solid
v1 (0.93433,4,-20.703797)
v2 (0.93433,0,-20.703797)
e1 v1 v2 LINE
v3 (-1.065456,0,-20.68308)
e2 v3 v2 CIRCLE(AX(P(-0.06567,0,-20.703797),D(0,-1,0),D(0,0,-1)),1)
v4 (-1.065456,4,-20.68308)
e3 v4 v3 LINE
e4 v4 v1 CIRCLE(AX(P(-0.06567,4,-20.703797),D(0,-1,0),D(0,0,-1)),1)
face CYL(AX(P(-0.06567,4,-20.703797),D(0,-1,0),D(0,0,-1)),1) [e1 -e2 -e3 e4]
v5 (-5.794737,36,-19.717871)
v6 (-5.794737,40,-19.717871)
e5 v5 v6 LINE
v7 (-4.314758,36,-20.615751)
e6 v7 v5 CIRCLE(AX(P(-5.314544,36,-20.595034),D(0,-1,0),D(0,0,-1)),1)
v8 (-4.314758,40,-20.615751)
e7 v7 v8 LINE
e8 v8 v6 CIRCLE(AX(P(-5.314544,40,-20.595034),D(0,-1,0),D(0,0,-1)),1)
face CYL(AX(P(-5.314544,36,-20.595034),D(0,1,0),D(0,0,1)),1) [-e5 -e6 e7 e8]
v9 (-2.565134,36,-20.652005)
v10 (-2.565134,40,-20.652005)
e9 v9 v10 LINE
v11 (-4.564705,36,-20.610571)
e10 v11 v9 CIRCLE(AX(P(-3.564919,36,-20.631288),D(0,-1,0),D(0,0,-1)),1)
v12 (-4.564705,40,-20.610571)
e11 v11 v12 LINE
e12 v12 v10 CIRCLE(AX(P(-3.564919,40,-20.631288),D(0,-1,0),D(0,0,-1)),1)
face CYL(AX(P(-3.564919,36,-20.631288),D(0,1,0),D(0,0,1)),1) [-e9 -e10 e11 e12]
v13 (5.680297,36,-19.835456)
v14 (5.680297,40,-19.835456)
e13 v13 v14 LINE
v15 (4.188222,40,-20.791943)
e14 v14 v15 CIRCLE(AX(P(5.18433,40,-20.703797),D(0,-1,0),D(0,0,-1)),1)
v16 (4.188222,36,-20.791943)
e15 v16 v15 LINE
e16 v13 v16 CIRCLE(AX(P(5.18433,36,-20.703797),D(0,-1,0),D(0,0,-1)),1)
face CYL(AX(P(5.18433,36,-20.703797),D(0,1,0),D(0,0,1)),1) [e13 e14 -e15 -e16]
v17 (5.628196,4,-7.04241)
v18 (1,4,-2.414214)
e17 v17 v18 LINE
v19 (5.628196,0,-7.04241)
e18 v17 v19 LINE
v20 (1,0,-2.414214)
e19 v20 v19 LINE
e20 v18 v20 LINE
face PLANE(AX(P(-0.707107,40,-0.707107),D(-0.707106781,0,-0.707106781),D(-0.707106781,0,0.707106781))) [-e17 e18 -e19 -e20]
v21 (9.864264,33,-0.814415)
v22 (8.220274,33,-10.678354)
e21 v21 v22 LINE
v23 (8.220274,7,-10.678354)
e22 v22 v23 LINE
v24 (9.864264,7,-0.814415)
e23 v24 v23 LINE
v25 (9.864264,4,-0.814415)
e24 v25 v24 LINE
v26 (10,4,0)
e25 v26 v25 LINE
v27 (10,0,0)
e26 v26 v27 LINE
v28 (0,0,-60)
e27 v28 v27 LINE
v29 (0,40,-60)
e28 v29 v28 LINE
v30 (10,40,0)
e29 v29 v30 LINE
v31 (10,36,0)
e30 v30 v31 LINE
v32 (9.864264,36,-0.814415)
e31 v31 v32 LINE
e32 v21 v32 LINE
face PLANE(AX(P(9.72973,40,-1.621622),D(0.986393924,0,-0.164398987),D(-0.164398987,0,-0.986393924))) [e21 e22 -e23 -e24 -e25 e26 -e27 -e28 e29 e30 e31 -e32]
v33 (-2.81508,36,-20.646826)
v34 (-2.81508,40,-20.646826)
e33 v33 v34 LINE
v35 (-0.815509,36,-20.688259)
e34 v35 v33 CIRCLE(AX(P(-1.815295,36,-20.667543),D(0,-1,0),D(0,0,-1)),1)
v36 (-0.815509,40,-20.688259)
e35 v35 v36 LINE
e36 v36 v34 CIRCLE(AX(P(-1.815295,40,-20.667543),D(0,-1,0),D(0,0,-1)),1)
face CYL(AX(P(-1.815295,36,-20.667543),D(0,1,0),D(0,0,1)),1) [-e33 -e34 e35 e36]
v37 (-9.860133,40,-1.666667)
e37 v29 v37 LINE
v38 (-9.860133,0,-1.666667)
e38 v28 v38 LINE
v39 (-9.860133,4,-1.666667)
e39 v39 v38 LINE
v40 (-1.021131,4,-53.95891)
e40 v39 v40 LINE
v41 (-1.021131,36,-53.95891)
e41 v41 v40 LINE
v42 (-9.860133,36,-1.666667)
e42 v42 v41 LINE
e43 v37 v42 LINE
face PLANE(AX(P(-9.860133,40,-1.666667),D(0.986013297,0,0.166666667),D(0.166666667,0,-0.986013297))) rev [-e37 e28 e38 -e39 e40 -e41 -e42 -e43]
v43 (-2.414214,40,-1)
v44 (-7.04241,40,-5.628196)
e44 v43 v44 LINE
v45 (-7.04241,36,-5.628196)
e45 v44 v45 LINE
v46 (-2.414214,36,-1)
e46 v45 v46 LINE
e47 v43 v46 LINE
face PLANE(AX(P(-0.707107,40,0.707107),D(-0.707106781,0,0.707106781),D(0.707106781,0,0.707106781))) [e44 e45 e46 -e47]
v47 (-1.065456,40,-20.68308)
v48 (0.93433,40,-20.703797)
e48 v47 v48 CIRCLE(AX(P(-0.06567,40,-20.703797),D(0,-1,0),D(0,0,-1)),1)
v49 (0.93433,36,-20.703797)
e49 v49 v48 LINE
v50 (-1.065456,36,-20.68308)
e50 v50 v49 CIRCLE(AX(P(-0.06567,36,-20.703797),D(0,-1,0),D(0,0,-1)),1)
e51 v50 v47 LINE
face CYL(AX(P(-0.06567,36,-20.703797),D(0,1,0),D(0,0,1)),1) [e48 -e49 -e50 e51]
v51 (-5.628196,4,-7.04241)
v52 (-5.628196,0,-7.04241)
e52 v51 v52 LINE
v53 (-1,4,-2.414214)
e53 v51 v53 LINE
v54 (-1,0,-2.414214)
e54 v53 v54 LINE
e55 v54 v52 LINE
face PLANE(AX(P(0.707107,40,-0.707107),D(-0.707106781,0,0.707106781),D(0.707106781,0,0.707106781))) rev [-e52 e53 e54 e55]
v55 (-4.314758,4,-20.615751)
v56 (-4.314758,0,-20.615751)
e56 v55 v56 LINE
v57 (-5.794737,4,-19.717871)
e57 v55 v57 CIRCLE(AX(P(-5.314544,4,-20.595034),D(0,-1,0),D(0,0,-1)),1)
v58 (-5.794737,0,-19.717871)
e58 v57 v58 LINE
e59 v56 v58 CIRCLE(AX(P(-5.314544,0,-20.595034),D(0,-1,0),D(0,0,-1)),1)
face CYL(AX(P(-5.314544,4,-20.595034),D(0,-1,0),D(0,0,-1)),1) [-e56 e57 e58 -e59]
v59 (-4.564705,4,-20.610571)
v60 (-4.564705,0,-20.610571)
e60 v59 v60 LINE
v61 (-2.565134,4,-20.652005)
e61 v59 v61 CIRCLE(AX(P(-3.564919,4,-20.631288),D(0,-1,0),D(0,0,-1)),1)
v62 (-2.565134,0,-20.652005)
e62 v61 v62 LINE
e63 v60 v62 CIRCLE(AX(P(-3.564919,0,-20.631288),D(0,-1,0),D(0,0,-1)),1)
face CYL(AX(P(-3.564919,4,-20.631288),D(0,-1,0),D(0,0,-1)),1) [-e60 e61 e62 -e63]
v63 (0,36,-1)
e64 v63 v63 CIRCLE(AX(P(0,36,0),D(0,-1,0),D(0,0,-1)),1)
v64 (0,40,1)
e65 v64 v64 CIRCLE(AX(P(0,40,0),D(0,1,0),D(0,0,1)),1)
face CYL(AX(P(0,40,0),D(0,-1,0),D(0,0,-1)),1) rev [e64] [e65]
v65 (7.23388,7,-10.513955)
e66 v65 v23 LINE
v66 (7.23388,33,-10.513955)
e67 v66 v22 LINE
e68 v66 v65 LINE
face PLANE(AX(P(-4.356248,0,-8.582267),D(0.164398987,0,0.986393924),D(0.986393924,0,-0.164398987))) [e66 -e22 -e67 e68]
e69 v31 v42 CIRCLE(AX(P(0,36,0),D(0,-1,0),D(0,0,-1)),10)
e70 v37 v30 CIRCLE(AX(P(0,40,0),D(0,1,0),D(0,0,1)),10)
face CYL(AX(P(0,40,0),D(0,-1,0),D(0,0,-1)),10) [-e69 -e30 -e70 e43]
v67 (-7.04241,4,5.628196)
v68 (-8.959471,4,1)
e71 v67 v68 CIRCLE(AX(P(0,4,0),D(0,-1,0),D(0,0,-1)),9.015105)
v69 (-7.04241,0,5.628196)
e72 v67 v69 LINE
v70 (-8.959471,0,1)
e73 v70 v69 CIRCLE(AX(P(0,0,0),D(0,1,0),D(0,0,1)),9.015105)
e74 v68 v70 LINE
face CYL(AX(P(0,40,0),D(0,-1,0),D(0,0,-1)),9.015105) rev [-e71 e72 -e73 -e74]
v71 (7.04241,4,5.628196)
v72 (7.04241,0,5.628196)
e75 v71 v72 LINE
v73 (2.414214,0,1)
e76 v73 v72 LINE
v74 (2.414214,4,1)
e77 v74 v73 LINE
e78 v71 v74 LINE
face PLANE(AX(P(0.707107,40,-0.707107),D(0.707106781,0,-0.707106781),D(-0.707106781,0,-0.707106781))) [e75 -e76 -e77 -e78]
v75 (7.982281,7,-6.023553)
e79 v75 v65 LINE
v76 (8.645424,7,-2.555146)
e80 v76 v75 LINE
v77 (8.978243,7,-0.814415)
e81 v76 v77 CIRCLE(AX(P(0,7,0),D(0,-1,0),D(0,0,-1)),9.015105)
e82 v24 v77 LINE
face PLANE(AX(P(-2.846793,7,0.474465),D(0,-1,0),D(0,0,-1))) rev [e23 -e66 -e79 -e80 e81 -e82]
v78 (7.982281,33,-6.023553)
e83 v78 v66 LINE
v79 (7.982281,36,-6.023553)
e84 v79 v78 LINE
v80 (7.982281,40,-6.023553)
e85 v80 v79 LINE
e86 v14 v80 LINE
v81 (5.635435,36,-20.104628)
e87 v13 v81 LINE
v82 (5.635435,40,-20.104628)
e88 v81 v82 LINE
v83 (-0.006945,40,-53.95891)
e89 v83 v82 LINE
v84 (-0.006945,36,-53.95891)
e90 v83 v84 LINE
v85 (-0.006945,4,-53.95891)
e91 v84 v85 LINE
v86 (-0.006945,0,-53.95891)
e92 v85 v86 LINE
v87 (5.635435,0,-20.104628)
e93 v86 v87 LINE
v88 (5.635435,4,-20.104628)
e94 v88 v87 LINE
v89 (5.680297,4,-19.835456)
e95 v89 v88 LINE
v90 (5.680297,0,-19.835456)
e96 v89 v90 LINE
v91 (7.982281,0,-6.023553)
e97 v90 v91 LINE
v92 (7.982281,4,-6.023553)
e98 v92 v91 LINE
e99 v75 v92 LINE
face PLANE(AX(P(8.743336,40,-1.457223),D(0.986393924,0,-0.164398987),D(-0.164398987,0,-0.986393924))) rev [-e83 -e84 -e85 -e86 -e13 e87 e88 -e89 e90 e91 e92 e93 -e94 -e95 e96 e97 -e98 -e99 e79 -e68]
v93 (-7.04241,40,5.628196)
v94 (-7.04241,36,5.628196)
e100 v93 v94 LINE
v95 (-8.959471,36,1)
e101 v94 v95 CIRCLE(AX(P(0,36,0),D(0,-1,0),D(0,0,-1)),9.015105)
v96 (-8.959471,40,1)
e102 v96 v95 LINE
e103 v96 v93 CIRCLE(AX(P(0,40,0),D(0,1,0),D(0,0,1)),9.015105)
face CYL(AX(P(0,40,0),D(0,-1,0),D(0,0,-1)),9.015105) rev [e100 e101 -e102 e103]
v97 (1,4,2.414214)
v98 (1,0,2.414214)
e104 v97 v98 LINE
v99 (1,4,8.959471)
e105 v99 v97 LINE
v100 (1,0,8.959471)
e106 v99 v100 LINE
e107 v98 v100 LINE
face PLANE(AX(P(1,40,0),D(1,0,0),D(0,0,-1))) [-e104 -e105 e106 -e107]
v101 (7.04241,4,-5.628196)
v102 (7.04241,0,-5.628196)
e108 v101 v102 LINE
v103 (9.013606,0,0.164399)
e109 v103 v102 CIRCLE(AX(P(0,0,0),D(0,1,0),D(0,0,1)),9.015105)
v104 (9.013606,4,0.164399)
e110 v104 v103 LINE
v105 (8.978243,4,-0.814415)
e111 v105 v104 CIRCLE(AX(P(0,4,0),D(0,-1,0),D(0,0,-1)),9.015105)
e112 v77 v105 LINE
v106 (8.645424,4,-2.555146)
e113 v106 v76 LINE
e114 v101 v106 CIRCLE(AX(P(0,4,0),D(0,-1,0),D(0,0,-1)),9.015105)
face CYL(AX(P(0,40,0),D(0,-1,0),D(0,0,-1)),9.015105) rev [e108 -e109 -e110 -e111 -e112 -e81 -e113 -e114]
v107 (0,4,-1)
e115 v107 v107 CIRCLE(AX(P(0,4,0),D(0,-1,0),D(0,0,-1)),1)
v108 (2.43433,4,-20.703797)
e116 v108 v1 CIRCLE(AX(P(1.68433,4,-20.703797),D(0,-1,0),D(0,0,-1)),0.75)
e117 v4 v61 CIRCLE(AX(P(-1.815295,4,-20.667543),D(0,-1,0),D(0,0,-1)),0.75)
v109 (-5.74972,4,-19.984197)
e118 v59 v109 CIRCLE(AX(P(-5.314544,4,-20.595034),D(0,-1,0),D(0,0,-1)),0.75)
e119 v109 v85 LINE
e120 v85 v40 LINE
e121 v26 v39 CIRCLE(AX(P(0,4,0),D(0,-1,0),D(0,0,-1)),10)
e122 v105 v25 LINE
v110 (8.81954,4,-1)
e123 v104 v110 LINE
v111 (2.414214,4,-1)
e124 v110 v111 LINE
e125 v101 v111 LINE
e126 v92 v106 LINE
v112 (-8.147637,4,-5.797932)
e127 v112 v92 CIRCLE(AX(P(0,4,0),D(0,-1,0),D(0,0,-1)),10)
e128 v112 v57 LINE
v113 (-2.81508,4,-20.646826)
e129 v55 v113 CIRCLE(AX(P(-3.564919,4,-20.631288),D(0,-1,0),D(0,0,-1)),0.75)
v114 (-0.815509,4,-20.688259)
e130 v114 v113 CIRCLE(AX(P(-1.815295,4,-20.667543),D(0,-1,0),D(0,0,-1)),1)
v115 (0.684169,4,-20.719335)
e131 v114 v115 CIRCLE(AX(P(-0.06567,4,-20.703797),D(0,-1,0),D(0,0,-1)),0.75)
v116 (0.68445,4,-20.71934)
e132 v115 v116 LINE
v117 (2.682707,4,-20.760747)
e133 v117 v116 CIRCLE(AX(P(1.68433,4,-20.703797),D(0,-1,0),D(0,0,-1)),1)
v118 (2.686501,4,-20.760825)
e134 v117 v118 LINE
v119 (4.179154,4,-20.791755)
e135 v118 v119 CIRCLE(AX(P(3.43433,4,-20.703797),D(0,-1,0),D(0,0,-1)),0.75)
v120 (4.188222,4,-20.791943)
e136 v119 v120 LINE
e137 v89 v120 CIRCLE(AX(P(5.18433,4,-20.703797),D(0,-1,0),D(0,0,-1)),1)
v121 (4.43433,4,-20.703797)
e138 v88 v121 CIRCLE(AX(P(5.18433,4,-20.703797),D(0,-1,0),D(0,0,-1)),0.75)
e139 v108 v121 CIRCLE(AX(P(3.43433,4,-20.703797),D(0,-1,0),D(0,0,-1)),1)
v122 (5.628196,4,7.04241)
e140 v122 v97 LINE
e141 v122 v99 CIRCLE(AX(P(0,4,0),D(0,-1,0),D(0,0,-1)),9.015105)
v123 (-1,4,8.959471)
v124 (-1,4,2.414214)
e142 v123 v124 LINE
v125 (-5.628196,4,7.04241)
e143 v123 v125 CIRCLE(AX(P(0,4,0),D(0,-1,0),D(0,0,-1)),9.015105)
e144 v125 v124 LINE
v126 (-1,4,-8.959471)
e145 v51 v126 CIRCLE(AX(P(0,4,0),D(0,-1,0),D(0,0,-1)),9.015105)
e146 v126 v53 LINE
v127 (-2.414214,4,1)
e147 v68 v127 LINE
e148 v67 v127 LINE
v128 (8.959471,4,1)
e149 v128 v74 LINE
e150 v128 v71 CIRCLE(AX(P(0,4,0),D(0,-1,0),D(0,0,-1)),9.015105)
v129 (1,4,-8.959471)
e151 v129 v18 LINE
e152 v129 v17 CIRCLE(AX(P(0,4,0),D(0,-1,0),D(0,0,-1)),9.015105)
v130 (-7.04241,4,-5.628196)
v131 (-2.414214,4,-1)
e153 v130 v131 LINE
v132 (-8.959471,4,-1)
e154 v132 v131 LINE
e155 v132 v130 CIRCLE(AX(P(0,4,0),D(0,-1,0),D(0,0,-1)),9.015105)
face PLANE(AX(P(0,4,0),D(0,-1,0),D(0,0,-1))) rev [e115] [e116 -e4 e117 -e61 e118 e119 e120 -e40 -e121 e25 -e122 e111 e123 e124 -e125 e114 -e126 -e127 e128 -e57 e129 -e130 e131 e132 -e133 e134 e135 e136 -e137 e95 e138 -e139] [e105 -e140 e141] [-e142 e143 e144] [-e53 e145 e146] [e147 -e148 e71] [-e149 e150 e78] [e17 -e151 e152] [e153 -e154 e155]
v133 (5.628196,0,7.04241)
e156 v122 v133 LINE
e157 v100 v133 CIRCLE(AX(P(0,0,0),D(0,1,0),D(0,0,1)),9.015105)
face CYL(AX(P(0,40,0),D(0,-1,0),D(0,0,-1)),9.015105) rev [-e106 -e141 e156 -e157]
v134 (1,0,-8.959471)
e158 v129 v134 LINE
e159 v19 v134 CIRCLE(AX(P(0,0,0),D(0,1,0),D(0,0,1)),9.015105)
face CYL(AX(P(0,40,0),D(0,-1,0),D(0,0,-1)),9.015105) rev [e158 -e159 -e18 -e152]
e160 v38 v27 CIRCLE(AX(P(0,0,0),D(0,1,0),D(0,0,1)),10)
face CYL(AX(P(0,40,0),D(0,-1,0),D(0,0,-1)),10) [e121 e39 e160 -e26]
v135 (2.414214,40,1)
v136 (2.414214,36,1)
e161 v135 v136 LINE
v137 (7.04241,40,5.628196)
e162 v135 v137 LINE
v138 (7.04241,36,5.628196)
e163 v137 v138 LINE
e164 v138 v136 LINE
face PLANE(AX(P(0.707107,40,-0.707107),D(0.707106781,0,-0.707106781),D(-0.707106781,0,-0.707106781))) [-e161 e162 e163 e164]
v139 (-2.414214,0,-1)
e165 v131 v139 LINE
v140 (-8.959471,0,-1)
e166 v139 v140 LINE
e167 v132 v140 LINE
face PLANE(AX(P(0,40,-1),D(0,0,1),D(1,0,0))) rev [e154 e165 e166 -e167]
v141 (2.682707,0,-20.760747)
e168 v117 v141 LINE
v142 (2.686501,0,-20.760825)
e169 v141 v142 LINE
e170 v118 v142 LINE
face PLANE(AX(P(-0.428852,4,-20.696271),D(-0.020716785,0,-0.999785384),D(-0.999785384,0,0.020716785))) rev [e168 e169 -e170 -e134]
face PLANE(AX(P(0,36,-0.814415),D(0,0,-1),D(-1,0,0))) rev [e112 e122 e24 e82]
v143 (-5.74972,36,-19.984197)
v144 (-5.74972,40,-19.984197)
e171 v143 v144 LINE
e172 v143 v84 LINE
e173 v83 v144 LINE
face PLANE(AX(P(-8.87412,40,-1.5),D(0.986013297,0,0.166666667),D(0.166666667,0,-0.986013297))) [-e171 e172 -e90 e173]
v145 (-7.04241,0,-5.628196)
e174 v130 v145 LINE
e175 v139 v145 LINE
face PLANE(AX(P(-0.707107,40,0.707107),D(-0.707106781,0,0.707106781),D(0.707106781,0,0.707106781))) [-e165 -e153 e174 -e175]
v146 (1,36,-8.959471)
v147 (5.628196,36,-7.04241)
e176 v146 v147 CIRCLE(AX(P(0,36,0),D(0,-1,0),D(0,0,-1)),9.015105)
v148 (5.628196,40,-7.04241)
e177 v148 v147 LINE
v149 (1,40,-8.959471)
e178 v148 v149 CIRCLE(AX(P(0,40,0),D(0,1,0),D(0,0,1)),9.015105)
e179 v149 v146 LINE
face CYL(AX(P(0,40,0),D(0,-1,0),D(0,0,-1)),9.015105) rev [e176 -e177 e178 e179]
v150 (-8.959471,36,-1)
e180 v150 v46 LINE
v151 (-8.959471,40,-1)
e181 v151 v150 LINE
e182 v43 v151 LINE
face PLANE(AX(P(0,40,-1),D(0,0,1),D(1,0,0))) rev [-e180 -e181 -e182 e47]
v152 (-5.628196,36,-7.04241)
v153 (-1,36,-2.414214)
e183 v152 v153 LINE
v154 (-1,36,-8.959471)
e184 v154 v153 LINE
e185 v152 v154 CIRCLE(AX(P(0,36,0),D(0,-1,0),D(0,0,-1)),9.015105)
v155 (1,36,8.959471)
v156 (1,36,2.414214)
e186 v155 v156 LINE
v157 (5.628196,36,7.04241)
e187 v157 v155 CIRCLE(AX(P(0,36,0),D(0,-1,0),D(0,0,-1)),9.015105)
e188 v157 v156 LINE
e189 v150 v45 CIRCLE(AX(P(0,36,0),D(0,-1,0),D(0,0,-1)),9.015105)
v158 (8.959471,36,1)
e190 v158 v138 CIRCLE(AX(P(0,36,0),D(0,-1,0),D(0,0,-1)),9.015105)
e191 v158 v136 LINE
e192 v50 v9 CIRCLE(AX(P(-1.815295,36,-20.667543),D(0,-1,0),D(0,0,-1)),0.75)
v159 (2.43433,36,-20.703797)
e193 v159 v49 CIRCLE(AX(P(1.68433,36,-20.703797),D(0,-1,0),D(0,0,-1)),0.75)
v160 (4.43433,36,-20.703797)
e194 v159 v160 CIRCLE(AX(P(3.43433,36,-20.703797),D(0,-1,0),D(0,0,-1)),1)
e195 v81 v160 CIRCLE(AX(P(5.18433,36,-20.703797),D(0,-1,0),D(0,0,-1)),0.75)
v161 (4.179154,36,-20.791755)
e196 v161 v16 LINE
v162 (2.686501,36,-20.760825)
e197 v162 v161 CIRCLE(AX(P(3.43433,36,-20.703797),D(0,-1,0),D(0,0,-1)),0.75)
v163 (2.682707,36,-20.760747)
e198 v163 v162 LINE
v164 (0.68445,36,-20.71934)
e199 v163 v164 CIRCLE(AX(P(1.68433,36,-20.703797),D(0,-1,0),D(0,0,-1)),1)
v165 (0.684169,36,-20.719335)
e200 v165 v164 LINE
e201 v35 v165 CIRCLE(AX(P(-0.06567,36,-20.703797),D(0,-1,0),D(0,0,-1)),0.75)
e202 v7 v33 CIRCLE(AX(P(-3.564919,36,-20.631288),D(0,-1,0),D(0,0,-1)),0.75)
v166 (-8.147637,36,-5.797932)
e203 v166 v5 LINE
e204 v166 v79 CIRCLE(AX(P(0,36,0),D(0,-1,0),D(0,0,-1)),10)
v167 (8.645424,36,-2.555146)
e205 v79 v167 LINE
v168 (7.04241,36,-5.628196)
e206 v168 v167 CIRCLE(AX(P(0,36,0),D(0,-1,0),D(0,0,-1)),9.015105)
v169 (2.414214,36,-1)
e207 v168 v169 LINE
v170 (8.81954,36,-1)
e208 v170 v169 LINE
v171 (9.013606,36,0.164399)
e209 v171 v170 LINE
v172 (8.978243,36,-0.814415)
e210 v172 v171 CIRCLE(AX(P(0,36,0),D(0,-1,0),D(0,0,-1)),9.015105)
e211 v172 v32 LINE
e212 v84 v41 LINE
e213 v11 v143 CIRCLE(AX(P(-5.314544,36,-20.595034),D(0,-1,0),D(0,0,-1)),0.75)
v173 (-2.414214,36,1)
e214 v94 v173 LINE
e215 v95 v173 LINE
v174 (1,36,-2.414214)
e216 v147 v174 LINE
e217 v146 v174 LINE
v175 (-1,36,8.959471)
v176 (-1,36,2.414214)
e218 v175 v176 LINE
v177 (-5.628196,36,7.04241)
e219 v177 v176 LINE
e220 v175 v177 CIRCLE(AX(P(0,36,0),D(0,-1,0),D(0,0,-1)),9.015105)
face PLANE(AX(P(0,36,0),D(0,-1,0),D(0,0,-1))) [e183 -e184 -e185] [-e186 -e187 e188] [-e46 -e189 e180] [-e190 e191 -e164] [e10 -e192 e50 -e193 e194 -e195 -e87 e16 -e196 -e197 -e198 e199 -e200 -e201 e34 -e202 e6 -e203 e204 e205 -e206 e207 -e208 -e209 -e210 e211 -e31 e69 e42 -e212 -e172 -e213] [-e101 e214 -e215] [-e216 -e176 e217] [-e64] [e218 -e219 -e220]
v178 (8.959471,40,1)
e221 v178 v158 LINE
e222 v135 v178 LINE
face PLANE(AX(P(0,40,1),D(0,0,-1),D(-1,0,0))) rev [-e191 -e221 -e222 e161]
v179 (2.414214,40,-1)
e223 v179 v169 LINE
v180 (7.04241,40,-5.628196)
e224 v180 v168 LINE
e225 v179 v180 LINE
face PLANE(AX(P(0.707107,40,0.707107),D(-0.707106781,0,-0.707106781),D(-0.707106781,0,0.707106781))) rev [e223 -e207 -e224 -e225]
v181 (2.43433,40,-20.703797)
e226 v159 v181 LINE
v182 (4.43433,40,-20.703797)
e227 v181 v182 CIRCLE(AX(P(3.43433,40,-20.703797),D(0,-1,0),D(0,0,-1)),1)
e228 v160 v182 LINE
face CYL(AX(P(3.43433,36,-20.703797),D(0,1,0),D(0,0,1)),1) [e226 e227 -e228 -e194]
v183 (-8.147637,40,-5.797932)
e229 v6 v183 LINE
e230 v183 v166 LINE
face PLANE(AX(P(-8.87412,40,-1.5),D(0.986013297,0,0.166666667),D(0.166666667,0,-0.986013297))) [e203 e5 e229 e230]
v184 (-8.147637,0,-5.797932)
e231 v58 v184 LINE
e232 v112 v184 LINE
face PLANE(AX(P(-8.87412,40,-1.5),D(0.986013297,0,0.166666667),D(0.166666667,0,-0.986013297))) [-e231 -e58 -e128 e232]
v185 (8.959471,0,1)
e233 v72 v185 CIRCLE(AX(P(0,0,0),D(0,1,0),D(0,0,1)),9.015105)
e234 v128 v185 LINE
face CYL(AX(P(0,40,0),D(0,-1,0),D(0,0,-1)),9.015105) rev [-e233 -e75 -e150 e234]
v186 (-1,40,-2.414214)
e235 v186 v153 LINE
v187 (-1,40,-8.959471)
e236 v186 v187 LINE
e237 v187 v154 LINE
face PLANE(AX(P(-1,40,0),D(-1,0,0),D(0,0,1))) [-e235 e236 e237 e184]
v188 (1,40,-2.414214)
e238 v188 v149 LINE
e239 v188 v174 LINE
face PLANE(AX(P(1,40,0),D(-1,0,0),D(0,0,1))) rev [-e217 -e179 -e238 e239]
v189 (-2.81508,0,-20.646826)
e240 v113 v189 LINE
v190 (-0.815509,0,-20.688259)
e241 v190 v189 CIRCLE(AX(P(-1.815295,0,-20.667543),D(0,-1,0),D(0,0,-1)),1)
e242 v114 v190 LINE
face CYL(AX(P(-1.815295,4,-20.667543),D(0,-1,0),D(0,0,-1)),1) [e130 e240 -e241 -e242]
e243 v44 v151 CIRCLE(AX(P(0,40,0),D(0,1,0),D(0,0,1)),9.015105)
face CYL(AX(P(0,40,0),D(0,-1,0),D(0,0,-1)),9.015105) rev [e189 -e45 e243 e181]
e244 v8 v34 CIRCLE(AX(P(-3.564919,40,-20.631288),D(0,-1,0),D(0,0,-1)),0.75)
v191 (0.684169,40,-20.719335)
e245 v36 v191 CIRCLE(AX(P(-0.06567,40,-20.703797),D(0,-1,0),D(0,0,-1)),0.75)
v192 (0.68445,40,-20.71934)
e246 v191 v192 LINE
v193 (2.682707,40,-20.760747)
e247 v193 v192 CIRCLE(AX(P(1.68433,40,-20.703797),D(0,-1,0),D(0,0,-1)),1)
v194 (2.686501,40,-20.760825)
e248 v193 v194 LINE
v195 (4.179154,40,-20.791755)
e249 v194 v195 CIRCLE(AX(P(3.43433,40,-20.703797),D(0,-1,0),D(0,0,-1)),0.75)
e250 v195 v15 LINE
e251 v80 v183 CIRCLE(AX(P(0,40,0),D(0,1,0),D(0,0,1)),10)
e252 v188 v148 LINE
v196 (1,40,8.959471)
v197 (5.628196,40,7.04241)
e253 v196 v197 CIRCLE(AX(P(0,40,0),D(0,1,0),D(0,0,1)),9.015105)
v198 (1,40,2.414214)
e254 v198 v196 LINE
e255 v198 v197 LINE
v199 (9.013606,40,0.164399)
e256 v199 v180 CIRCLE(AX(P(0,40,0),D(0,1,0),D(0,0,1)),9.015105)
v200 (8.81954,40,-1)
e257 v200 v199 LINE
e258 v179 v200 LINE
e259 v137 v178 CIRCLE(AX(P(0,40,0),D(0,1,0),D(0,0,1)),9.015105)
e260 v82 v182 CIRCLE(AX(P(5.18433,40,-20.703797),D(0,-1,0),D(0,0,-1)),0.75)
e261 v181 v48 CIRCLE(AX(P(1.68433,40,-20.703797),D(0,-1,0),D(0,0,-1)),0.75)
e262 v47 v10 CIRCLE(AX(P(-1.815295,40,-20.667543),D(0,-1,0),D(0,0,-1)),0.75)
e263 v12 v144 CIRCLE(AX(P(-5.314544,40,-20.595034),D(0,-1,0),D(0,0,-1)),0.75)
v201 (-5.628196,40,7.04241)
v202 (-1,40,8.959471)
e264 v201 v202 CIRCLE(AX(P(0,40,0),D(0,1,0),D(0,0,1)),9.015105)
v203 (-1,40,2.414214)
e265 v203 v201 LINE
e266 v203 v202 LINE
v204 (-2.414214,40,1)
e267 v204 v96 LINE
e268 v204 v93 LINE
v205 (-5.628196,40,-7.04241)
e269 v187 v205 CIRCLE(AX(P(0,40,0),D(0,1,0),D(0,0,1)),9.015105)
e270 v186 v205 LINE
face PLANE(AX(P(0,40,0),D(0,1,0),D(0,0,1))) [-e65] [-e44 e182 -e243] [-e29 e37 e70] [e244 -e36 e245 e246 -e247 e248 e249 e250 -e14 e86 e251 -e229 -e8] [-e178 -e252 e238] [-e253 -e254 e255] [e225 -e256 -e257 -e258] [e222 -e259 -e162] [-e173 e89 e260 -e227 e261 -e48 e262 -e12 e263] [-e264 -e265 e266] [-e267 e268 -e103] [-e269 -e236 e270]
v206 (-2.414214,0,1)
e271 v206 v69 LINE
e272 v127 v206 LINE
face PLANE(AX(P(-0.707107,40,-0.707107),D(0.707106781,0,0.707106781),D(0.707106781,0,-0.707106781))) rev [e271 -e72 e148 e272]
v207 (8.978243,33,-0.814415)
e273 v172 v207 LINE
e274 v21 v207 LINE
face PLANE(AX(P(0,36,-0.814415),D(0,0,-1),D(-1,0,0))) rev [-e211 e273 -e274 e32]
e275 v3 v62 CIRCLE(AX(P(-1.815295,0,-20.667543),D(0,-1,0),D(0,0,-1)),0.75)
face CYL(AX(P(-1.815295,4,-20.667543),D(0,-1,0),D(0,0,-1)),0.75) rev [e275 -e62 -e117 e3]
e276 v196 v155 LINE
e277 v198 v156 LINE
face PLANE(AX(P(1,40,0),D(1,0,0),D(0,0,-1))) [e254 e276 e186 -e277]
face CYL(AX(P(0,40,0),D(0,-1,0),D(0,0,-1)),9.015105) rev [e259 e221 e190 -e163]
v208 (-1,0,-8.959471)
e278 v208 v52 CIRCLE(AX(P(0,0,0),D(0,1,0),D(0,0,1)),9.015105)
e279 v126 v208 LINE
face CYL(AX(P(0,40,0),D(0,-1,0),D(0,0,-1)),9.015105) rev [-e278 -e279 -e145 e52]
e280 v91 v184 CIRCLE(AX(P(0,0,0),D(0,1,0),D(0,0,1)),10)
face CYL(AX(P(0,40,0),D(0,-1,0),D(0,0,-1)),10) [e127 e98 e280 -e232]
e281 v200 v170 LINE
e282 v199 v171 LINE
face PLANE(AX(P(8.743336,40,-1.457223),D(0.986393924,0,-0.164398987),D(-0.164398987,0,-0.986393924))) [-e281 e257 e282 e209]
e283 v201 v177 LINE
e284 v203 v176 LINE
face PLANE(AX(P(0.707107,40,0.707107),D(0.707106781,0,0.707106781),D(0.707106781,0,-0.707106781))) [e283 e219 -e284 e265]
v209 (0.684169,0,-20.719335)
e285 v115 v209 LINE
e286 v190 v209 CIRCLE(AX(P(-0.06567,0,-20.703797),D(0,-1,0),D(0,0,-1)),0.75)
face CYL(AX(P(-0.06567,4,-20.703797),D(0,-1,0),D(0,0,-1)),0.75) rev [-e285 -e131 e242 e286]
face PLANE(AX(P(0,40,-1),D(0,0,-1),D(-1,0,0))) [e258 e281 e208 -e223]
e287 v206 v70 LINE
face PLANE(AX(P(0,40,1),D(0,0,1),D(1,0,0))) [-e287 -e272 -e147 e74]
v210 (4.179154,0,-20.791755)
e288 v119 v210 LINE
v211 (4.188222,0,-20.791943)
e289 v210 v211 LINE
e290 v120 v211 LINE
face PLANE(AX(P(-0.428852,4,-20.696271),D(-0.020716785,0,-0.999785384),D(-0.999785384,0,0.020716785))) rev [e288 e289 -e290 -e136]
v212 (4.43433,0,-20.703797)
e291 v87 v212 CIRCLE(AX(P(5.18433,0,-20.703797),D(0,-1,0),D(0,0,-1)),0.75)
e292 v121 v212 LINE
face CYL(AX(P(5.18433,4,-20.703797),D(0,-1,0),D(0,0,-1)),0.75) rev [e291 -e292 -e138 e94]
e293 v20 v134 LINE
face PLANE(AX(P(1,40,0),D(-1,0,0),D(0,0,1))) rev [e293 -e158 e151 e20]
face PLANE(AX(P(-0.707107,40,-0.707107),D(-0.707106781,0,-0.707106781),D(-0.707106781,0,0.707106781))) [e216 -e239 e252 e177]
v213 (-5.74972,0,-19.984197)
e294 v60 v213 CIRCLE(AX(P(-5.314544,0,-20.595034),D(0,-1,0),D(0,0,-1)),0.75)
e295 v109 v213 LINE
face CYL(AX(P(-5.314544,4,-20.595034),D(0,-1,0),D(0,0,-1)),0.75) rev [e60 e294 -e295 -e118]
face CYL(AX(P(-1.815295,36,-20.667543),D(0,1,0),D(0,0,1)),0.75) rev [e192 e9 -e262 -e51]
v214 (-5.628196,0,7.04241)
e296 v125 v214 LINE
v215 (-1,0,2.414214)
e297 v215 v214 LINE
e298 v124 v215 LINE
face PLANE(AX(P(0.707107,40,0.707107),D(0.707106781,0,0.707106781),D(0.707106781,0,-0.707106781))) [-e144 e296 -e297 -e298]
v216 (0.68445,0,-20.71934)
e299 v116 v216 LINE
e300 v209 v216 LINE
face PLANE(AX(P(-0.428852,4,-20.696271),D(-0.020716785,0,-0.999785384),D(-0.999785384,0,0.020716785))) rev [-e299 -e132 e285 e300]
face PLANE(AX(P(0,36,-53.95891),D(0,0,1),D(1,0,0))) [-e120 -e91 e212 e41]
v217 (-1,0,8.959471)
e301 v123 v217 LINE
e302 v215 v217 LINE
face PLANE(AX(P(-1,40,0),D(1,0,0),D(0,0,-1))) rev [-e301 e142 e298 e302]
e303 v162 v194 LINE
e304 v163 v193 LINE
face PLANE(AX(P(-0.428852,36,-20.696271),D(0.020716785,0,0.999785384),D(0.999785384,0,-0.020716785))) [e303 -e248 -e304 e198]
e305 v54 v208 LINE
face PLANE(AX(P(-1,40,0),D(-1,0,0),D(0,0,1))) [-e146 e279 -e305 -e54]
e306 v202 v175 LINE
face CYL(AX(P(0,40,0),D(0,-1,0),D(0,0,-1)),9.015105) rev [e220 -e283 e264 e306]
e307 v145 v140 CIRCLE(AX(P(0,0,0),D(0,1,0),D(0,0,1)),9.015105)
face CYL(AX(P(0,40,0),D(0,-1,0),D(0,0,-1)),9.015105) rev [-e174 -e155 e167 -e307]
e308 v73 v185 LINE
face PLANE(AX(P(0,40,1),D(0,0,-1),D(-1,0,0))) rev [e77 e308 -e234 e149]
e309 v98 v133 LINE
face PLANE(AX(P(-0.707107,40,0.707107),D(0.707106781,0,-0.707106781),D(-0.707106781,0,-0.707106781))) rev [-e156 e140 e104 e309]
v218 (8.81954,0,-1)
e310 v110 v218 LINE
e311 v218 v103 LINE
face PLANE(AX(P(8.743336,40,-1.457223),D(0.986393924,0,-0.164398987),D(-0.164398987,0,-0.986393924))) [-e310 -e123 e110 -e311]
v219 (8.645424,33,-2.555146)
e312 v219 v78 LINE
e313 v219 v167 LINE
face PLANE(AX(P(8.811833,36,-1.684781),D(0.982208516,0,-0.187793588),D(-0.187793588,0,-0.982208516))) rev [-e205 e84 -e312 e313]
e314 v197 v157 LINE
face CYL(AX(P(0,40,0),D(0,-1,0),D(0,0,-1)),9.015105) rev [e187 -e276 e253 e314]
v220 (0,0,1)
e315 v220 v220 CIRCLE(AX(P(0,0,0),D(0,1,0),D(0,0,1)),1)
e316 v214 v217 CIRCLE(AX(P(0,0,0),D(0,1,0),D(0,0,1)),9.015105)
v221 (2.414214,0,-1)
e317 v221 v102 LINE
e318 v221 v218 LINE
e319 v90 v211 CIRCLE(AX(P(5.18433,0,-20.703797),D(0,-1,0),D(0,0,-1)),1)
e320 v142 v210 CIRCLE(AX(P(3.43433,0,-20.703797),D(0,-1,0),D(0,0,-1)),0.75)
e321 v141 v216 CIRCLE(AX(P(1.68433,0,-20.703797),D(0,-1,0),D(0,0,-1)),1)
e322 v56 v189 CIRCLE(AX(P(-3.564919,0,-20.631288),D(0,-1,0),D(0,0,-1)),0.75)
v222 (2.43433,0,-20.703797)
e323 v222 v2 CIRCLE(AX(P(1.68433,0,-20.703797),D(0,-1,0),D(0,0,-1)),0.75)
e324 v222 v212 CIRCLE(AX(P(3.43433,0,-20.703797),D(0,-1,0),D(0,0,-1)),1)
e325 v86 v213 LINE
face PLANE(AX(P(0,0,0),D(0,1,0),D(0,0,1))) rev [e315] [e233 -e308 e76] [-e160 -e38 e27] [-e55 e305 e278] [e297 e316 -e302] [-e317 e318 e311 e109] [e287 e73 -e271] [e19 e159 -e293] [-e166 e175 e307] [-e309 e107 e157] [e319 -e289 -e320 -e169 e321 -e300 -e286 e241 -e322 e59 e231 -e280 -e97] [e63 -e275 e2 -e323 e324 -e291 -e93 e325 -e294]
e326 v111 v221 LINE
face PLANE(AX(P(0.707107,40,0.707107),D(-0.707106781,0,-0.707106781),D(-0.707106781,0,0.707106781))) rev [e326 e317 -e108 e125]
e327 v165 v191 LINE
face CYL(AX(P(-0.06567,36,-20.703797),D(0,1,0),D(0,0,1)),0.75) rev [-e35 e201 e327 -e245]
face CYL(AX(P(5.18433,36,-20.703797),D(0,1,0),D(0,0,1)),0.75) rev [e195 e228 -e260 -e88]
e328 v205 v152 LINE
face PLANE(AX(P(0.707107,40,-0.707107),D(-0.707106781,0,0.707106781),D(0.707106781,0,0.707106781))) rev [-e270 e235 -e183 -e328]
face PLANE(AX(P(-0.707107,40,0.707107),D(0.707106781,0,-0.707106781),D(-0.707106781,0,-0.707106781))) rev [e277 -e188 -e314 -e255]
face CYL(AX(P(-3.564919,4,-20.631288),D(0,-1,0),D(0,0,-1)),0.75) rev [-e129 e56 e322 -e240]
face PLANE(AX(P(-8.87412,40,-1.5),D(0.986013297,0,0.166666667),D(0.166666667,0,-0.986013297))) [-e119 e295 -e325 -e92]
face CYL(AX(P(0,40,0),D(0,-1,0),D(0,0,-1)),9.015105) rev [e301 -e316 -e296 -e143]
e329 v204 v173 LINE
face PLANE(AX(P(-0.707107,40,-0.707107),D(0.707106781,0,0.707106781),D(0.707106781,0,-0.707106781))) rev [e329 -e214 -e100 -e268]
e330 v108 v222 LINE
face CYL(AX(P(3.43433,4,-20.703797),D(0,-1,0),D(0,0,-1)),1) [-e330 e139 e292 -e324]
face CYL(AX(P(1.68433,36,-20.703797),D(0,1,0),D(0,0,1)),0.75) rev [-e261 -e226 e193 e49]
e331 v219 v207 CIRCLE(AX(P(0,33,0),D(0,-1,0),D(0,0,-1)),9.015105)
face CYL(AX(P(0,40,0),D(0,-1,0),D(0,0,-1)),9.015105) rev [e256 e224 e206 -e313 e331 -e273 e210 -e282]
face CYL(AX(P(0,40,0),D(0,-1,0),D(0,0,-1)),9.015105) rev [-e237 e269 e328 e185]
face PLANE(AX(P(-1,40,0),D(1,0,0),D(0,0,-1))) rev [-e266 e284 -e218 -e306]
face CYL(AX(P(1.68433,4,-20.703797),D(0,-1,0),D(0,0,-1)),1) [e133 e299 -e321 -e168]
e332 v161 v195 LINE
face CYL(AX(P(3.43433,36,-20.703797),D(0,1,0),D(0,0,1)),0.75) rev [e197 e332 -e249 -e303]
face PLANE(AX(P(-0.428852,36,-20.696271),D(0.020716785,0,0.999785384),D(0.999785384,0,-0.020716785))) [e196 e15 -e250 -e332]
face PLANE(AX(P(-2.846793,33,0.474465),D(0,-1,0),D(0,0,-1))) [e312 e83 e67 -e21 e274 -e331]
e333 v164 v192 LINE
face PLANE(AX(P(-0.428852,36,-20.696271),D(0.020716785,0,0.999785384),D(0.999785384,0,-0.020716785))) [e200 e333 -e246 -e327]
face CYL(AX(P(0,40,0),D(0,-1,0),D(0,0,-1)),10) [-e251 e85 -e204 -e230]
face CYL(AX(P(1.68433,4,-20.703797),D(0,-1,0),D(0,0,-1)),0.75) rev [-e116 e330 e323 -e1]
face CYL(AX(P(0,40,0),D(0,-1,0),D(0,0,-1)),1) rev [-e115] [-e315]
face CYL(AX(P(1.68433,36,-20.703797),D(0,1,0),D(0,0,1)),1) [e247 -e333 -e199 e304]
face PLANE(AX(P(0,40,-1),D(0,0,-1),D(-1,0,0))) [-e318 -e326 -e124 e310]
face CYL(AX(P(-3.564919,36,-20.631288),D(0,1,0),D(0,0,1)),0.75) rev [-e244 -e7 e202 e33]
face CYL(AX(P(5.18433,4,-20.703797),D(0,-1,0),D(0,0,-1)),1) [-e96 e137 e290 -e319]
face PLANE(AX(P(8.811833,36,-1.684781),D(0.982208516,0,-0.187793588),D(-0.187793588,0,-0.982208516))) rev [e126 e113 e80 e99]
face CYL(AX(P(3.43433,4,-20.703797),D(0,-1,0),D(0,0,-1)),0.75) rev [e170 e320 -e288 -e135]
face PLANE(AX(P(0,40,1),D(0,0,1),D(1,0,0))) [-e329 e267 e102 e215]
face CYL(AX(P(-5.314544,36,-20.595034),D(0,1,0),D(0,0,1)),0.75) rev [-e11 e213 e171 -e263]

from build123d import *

# Parameters (mm, degrees)
SKETCH1_R           = 1
BOSS_EXTRUDE1_DEPTH = 40
CUT_EXTRUDE2_DEPTH  = 16
SKETCH5_W           = 10
SKETCH5_H           = 26
CUT_EXTRUDE3_DEPTH  = 12.75
BOSS_EXTRUDE2_DEPTH = 4


with BuildPart() as part:
    # Sketch1 → Boss-Extrude1 (new body)
    with BuildSketch(Plane(origin=(0, 0, 0), x_dir=(1, 0, 0), z_dir=(0, 1, 0))):
        with BuildLine():
            Line((10, 0), (0, 60))
            Line((0, 60), (-9.860132972, 1.666666667))
            ThreePointArc((-9.860132972, 1.666666667), (-0.836262603, -9.964971895), (10, 0))
        make_face()
        Circle(SKETCH1_R, mode=Mode.SUBTRACT)
        with BuildLine():
            Line((-1, 8.959471052), (-1, 2.414213562))
            Line((-1, 2.414213562), (-5.628195955, 7.042409518))
            ThreePointArc((-5.628195955, 7.042409518), (-3.449931396, 8.328871165), (-1, 8.959471052))
        make_face(mode=Mode.SUBTRACT)
        with BuildLine():
            Line((-7.042409518, 5.628195955), (-2.414213562, 1))
            Line((-2.414213562, 1), (-8.959471052, 1))
            ThreePointArc((-8.959471052, 1), (-8.328871165, 3.449931396), (-7.042409518, 5.628195955))
        make_face(mode=Mode.SUBTRACT)
        with BuildLine():
            Line((1, 2.414213562), (1, 8.959471052))
            ThreePointArc((1, 8.959471052), (3.449931396, 8.328871165), (5.628195955, 7.042409518))
            Line((5.628195955, 7.042409518), (1, 2.414213562))
        make_face(mode=Mode.SUBTRACT)
        with BuildLine():
            Line((-8.147636517, 5.797932319), (-0.006945449, 53.958910167))
            Line((-0.006945449, 53.958910167), (7.982280685, 6.023553358))
            ThreePointArc((7.982280685, 6.023553358), (-0.139863688, 9.99902186), (-8.147636517, 5.797932319))
        make_face(mode=Mode.SUBTRACT)
        with BuildLine():
            Line((2.414213562, 1), (7.042409518, 5.628195955))
            ThreePointArc((7.042409518, 5.628195955), (8.328871165, 3.449931396), (8.959471052, 1))
            ThreePointArc((8.959471052, 1), (9.005377927, 0.418676383), (9.013606076, -0.164398987))
            Line((9.013606076, -0.164398987), (8.819539578, 1))
            Line((8.819539578, 1), (2.414213562, 1))
        make_face(mode=Mode.SUBTRACT)
        with BuildLine():
            Line((-8.959471052, -1), (-2.414213562, -1))
            Line((-2.414213562, -1), (-7.042409518, -5.628195955))
            ThreePointArc((-7.042409518, -5.628195955), (-8.328871165, -3.449931396), (-8.959471052, -1))
        make_face(mode=Mode.SUBTRACT)
        with BuildLine():
            ThreePointArc((-1, -8.959471052), (-3.449931396, -8.328871165), (-5.628195955, -7.042409518))
            Line((-5.628195955, -7.042409518), (-1, -2.414213562))
            Line((-1, -2.414213562), (-1, -8.959471052))
        make_face(mode=Mode.SUBTRACT)
        with BuildLine():
            ThreePointArc((5.628195955, -7.042409518), (3.449931396, -8.328871165), (1, -8.959471052))
            Line((1, -8.959471052), (1, -2.414213562))
            Line((1, -2.414213562), (5.628195955, -7.042409518))
        make_face(mode=Mode.SUBTRACT)
        with BuildLine():
            ThreePointArc((8.959471052, -1), (8.328871165, -3.449931396), (7.042409518, -5.628195955))
            Line((7.042409518, -5.628195955), (2.414213562, -1))
            Line((2.414213562, -1), (8.959471052, -1))
        make_face(mode=Mode.SUBTRACT)
    extrude(amount=BOSS_EXTRUDE1_DEPTH)

    # Sketch4 → Cut-Extrude2 (cut, symmetric)
    with BuildSketch(Plane(origin=(0, 20, 0), x_dir=(-1, 0, 0), z_dir=(0, -1, 0))):
        Polygon((-8.877415303, 1.341770275), (-8.978243143, 0.814414874), (-12.501432649, 0.814414874), (-12.501432649, -9.874000046), (27.256185967, -11.315556265), (27.256185967, 53.958910167), (0.006945449, 53.958910167), (-7.982280685, 6.023553358), (-8.645423601, 2.555146235), (-8.746251441, 2.027790834), align=None)
    extrude(amount=CUT_EXTRUDE2_DEPTH, both=True, mode=Mode.SUBTRACT)

    # Sketch5 → Cut-Extrude3 (cut, symmetric)
    with BuildSketch(Plane(origin=(9.72972973, 0, -1.621621622), x_dir=(-0.1643989873053573, 0, -0.9863939238321439), z_dir=(0.9863939238321439, 0, -0.1643989873053573))):
        with Locations((4.181658841, 20)):
            Rectangle(SKETCH5_W, SKETCH5_H)
    extrude(amount=CUT_EXTRUDE3_DEPTH, both=True, mode=Mode.SUBTRACT)

    # Sketch6 → Boss-Extrude2 (add)
    with BuildSketch(Plane.XZ):
        with BuildLine():
            Line((-5.794737363, -19.717871437), (-5.749720089, -19.984197223))
            ThreePointArc((-5.749720089, -19.984197223), (-4.964059213, -19.93196472), (-4.56470455, -20.610571454))
            ThreePointArc((-4.56470455, -20.610571454), (-3.58563596, -21.631073632), (-2.565133782, -20.652005041))
            ThreePointArc((-2.565133782, -20.652005041), (-1.79975716, -19.917703584), (-1.065455705, -20.683080209))
            ThreePointArc((-1.065455705, -20.683080209), (-0.07602927, -21.703743341), (0.934329679, -20.703796997))
            ThreePointArc((0.934329679, -20.703796997), (1.684329679, -19.953796997), (2.434329679, -20.703796997))
            ThreePointArc((2.434329679, -20.703796997), (3.434329679, -21.703796997), (4.434329679, -20.703796997))
            ThreePointArc((4.434329679, -20.703796997), (4.849537937, -20.032667732), (5.635434984, -20.104627568))
            Line((5.635434984, -20.104627568), (5.680296948, -19.83545578))
            ThreePointArc((5.680296948, -19.83545578), (4.644652017, -19.86192526), (4.188222104, -20.791942891))
            Line((4.188222104, -20.791942891), (4.179154082, -20.79175499))
            ThreePointArc((4.179154082, -20.79175499), (3.41879209, -21.453636035), (2.68650098, -20.760825378))
            Line((2.68650098, -20.760825378), (2.682706725, -20.760746756))
            ThreePointArc((2.682706725, -20.760746756), (1.712816119, -19.704202818), (0.684329679, -20.703796997))
            ThreePointArc((0.684329679, -20.703796997), (-0.073439528, -21.453756755), (-0.815509359, -20.688259416))
            ThreePointArc((-0.815509359, -20.688259416), (-1.794577953, -19.667757238), (-2.815080128, -20.646825835))
            ThreePointArc((-2.815080128, -20.646825835), (-3.580456755, -21.381127286), (-4.314758204, -20.615750657))
            ThreePointArc((-4.314758204, -20.615750657), (-4.795852319, -19.740072256), (-5.794737363, -19.717871437))
        make_face()
    boss_extrude2 = extrude(amount=-BOSS_EXTRUDE2_DEPTH)

    # Mirror2: Boss-Extrude2 across plane
    add(boss_extrude2.mirror(Plane(origin=(0, 20, 0), x_dir=(0, 0, 1), z_dir=(0, -1, 0))))


solid = part.part
